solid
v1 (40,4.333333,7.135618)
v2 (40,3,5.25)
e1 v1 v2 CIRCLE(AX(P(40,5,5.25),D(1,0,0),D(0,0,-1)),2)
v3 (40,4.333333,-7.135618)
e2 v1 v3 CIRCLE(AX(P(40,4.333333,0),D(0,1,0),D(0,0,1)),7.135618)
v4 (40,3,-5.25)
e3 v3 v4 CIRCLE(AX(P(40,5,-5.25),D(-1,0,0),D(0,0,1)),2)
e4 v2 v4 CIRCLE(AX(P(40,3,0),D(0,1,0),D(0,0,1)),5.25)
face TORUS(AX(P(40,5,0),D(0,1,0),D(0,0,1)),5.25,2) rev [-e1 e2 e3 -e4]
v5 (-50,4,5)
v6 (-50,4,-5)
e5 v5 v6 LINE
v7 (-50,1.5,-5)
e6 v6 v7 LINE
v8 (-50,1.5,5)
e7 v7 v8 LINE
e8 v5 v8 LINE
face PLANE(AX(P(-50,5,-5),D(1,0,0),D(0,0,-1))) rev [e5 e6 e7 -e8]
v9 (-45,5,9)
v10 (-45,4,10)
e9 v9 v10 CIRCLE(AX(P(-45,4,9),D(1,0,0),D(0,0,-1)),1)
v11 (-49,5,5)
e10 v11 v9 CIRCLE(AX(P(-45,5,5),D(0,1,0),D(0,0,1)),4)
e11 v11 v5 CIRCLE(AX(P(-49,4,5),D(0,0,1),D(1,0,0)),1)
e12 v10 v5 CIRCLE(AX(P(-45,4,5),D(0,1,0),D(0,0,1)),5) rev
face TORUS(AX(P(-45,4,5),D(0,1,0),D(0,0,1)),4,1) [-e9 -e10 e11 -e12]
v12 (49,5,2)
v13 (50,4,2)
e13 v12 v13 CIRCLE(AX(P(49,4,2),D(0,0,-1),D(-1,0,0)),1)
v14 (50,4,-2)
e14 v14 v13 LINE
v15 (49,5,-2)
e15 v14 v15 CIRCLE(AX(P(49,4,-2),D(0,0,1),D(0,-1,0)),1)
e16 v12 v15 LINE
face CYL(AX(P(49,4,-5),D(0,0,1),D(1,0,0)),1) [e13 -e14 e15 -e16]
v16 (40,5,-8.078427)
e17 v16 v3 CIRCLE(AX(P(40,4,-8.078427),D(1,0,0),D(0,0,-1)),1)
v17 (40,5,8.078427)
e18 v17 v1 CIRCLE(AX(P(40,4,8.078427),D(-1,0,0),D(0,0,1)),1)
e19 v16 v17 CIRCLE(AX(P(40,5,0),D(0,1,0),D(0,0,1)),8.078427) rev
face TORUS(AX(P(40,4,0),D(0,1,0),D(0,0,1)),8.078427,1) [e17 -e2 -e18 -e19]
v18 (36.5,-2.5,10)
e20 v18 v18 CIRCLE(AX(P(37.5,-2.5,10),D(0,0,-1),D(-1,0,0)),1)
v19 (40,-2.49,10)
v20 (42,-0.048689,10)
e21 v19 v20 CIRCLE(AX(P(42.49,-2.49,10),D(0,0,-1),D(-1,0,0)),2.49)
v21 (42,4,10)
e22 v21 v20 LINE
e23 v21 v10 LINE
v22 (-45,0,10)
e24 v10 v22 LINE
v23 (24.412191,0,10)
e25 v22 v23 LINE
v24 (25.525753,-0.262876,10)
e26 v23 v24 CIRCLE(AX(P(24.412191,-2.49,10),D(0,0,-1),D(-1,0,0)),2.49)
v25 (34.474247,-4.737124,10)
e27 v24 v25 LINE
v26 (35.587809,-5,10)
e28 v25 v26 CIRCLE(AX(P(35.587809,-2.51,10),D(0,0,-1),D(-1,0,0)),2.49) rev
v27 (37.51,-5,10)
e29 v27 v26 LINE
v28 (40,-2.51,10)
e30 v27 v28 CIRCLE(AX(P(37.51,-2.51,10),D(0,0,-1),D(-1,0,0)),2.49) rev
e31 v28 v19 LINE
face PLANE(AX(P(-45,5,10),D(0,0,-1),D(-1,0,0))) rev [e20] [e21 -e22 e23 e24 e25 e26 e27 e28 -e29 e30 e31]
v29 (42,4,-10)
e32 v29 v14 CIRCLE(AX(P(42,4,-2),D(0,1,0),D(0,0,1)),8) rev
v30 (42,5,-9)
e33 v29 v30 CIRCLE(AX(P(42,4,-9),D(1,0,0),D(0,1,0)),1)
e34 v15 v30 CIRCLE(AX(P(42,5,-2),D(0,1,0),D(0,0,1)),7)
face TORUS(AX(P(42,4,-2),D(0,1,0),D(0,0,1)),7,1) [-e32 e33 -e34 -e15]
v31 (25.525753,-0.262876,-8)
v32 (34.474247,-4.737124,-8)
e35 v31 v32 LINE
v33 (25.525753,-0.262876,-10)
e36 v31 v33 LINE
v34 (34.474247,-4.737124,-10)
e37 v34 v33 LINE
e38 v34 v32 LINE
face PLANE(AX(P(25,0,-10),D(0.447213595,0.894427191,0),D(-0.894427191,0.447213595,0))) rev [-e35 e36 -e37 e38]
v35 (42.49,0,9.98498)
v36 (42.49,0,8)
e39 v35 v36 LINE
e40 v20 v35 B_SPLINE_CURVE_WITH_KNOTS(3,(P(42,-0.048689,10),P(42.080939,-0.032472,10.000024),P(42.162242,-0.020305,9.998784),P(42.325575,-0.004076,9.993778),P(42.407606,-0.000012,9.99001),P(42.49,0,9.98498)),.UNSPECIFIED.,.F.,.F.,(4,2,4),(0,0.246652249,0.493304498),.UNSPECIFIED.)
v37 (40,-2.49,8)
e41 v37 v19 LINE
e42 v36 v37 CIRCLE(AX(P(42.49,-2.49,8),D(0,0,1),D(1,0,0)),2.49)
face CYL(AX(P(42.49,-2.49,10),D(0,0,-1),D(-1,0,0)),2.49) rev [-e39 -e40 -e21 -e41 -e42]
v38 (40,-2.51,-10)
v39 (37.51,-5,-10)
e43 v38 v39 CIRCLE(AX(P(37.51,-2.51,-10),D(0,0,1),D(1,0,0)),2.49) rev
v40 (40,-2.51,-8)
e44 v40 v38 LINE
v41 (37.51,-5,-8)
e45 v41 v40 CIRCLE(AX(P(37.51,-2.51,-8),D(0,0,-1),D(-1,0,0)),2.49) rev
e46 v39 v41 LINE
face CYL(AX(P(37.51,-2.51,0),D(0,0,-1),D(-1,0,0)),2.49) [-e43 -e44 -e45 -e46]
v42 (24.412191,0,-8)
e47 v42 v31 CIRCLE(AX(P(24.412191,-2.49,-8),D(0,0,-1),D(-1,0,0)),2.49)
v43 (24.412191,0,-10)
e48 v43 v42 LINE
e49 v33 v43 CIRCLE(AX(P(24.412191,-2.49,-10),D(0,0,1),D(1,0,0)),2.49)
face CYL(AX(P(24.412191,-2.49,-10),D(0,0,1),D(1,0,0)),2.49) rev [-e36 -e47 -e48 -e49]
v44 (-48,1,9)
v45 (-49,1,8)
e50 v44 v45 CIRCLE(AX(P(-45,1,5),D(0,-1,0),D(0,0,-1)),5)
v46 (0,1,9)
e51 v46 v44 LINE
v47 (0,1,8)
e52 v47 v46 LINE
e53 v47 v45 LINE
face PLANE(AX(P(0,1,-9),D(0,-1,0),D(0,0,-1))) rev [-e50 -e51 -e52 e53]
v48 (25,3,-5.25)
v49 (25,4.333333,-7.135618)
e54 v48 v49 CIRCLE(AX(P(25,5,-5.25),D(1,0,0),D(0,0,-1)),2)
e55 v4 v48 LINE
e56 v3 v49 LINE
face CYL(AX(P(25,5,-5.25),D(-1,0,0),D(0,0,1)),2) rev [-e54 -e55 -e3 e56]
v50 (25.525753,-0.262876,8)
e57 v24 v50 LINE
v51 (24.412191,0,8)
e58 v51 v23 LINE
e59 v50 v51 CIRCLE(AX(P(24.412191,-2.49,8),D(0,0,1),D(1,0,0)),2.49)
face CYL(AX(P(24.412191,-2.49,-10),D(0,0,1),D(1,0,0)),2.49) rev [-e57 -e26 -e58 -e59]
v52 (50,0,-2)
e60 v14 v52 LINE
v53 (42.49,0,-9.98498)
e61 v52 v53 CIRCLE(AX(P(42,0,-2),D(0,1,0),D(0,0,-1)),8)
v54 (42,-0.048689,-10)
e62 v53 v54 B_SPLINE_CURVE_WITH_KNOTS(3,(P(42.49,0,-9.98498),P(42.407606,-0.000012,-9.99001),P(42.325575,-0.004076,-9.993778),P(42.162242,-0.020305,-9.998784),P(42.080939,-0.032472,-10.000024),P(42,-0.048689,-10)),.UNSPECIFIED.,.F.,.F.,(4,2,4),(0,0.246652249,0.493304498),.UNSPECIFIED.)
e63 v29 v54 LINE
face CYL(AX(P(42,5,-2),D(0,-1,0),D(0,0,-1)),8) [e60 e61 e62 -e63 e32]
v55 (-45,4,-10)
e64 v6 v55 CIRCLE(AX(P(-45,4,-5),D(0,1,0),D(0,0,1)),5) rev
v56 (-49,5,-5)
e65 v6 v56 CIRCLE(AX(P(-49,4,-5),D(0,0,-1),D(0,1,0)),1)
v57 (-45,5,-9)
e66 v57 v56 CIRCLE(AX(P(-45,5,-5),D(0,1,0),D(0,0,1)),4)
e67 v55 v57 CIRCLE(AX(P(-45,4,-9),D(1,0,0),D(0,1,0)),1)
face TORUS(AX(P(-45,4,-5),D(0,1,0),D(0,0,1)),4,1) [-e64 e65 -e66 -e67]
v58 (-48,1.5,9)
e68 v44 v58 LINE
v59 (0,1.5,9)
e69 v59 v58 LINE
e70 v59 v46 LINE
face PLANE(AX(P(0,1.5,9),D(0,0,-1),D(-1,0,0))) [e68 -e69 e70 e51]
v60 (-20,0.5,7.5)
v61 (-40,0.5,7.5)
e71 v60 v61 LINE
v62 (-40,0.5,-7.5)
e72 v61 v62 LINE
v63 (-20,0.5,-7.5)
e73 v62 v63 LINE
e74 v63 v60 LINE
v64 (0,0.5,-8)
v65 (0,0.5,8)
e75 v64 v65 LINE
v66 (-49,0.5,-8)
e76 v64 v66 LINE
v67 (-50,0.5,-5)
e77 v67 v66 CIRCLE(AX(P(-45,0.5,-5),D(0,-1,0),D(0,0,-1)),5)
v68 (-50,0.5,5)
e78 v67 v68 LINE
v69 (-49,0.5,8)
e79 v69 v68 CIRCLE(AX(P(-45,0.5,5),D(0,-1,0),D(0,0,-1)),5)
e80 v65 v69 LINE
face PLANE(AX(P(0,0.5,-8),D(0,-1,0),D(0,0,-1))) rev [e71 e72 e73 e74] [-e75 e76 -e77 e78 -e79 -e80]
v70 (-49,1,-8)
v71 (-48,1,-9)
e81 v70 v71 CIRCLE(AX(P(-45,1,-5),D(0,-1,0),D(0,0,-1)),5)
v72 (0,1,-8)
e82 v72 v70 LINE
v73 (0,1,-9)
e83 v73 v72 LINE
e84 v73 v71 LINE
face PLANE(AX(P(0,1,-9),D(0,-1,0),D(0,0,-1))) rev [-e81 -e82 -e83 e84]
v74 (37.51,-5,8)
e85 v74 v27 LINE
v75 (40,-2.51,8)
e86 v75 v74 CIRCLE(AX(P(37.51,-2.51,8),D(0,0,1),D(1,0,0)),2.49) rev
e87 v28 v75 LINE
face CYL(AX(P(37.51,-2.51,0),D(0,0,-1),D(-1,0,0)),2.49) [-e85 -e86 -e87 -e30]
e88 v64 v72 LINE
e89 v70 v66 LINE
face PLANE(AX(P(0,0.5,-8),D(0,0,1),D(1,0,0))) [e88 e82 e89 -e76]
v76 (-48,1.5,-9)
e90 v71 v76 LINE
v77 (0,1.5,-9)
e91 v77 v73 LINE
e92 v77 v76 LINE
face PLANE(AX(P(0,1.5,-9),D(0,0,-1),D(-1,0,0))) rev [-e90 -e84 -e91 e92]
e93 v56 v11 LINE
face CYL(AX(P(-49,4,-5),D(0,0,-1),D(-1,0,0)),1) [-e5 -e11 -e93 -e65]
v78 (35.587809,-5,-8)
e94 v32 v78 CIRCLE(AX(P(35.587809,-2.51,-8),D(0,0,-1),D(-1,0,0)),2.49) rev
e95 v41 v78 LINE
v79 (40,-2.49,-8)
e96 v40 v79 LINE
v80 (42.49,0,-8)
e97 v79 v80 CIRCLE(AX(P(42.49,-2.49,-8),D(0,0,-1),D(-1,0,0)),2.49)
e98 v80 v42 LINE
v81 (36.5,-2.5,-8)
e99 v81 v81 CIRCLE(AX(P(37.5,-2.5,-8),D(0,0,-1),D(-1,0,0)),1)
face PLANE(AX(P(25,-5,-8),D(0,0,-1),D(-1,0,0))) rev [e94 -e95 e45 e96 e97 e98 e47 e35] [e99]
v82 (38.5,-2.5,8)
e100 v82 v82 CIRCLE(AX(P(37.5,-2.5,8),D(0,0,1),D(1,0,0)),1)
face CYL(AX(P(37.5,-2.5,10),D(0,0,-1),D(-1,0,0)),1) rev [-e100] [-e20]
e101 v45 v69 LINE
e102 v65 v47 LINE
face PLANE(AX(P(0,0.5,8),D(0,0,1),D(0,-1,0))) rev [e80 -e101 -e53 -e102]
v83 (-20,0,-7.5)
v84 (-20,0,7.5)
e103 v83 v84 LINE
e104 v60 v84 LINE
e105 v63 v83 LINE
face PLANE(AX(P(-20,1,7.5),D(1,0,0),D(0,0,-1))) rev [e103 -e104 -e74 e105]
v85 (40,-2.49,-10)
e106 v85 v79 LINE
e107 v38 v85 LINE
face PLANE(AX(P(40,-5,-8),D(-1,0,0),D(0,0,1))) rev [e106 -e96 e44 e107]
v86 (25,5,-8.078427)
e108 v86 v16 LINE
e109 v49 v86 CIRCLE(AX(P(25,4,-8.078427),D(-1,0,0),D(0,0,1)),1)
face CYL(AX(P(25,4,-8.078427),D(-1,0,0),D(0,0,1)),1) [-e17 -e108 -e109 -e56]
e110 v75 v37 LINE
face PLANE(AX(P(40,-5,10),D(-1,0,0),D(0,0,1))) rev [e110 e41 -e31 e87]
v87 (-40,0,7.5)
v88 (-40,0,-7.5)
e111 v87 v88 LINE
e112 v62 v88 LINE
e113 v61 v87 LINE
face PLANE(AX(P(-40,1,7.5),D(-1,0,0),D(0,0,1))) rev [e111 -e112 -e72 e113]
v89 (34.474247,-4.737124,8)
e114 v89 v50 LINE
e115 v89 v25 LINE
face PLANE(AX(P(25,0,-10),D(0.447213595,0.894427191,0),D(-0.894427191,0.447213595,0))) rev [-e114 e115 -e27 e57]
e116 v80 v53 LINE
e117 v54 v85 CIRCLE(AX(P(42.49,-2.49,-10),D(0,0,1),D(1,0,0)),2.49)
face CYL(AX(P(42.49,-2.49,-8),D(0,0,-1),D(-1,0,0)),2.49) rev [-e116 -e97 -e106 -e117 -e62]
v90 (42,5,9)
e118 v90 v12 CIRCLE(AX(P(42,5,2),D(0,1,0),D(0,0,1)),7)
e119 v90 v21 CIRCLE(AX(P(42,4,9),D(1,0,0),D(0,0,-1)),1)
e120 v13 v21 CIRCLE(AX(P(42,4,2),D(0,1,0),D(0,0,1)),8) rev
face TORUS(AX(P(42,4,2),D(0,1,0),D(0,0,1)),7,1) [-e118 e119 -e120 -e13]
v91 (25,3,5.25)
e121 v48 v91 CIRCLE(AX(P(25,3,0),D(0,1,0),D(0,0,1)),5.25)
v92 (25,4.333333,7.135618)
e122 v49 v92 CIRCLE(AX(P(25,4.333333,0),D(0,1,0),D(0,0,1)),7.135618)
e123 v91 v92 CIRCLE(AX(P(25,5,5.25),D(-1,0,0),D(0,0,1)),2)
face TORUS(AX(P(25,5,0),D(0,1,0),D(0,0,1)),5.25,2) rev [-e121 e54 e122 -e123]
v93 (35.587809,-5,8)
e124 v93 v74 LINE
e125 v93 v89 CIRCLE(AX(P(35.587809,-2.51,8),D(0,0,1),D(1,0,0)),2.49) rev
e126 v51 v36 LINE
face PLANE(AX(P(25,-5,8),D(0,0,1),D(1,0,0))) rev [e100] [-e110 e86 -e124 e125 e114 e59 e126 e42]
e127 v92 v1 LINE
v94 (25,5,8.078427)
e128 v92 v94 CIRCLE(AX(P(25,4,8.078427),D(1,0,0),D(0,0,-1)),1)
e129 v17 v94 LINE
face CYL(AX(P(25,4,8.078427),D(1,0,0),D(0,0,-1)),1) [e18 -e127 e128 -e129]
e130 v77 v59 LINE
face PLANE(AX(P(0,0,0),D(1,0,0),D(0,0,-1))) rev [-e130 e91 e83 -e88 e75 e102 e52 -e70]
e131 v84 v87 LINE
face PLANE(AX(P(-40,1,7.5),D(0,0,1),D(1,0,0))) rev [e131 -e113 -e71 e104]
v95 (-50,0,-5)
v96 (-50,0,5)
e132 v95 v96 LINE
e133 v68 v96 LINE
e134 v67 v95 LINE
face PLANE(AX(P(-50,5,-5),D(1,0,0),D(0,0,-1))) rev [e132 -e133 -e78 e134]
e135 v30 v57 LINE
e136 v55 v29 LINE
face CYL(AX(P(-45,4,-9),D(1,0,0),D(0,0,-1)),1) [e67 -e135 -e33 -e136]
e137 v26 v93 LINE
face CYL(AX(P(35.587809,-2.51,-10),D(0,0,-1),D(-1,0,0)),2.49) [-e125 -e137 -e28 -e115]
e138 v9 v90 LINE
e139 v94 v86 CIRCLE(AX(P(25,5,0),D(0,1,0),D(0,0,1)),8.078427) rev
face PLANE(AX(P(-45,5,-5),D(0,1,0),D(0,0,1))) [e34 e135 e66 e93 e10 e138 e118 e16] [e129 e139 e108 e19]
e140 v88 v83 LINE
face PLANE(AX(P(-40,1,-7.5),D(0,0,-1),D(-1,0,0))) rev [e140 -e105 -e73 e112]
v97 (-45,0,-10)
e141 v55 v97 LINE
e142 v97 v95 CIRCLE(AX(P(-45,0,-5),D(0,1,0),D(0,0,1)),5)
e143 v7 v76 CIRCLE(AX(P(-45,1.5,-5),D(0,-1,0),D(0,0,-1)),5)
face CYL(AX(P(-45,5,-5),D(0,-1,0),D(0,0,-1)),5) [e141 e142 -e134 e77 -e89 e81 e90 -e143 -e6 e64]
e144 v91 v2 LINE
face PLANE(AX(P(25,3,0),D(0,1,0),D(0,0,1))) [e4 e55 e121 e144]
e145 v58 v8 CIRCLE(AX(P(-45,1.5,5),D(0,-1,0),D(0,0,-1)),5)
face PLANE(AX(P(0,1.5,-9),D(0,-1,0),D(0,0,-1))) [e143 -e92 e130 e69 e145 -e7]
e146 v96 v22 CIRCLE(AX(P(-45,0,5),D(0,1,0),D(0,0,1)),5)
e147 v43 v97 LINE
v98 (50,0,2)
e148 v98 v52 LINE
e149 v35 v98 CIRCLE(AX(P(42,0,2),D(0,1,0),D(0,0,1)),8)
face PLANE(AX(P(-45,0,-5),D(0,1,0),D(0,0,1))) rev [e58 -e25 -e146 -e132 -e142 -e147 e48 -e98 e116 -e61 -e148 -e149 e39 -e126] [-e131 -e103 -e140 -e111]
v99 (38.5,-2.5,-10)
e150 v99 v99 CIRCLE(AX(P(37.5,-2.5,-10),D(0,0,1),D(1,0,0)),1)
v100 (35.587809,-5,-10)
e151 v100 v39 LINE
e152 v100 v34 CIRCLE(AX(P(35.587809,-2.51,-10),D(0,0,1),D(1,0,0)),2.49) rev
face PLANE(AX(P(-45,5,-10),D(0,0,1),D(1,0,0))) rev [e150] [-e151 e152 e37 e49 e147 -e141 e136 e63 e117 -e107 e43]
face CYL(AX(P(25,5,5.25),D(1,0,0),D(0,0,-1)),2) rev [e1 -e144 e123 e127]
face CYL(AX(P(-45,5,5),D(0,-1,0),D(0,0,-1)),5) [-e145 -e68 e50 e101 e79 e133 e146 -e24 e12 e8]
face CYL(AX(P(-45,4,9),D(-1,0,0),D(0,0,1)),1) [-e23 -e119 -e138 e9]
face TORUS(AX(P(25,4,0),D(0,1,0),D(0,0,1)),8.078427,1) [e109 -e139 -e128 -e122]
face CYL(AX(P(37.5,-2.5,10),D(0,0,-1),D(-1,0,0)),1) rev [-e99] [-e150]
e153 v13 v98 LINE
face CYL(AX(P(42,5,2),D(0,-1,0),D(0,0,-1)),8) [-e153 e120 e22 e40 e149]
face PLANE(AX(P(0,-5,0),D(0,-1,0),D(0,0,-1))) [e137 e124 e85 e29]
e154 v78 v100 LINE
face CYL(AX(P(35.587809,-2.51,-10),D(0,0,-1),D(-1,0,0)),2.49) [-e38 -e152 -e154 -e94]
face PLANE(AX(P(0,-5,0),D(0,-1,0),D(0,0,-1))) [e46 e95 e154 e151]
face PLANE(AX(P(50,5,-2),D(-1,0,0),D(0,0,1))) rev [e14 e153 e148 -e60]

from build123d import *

# Parameters (mm, degrees)
BOSS_EXTRUDE1_DEPTH     = 5
CUT_EXTRUDE2_DEPTH      = 2
FILLET1_R               = 2
FILLET2_R               = 1
SKETCH8_W               = 18
SKETCH8_H               = 0.5
SKETCH8_W_2             = 16
CUT_EXTRUDE3_DEPTH      = 50
FILLET3_R               = 1
SKETCH9_W               = 20
SKETCH9_H               = 15
CUT_EXTRUDE4_DEPTH      = 1
SKETCH10_W              = 15
SKETCH10_H              = 2
BOSS_EXTRUDE2_DEPTH     = 5
FILLET4_R               = 2.49
CUT_EXTRUDE5_DEPTH      = 55.083269261
CUT_EXTRUDE5_DEPTH_BACK = 55.083269261
FILLET5_R               = 2.49
CUT_EXTRUDE6_DEPTH      = 55.083269261
CUT_EXTRUDE6_DEPTH_BACK = 55.083269261
SKETCH13_R              = 1


# Some blends are built 0.0001 mm under size
with BuildPart() as part:
    # Sketch2 → Boss-Extrude1 (new body)
    with BuildSketch(Plane(origin=(0, 0, 0), x_dir=(1, 0, 0), z_dir=(0, 1, 0))):
        with BuildLine():
            Line((-45, 10), (42, 10))
            ThreePointArc((42, 10), (47.656854249, 7.656854249), (50, 2))
            Line((50, 2), (50, -2))
            ThreePointArc((50, -2), (47.656854249, -7.656854249), (42, -10))
            Line((42, -10), (-45, -10))
            ThreePointArc((-45, -10), (-48.535533906, -8.535533906), (-50, -5))
            Line((-50, -5), (-50, 5))
            ThreePointArc((-50, 5), (-48.535533906, 8.535533906), (-45, 10))
        make_face()
    extrude(amount=BOSS_EXTRUDE1_DEPTH)

    # Sketch7 → Cut-Extrude2 (cut)
    with BuildSketch(Plane(origin=(0, 5, 0), x_dir=(1, 0, 0), z_dir=(0, 1, 0))):
        with BuildLine():
            Line((25, 7.25), (40, 7.25))
            ThreePointArc((40, 7.25), (47.25, 0), (40, -7.25))
            Line((40, -7.25), (25, -7.25))
            ThreePointArc((25, -7.25), (17.75, 0), (25, 7.25))
        make_face()
    extrude(amount=-CUT_EXTRUDE2_DEPTH, mode=Mode.SUBTRACT)

    # Fillet1
    fillet1_edges = [part.edges().sort_by_distance(p)[0] for p in [
        (32.5, 3, 7.25),
        (17.75, 3, 0),
        (47.25, 3, 0),
        (32.5, 3, -7.25),
    ]]
    fillet(fillet1_edges, radius=FILLET1_R - 0.0001)  # a hair under: the kernel refuses the full size

    # Fillet2
    # the kernel refuses this fillet: 1 mm, written as the material it takes off along each edge
    with BuildSketch(Plane(origin=(25, 5, 0), x_dir=(0, 0, 1), z_dir=(1, 0, 0))) as fillet2_piece_1:
        with BuildLine():
            CenterArc((8.078456413, 1), FILLET2_R, 199.469870121, 70.53012988)
            Line((8.078456413, 0), (8.078456413, -0.1))
            Line((8.078456413, -0.1), (7.25, -0.1))
            Line((7.25, -0.1), (7.15, 0))
            ThreePointArc((7.15, 0), (7.15, 0.0001), (7.041357825, 0.633357779))
            Line((7.041357825, 0.633357779), (7.135639515, 0.66668889))
        make_face()
    revolve(axis=Axis((25, 5, 0), (0, -1, 0)), revolution_arc=180, mode=Mode.SUBTRACT)
    with BuildSketch(Plane(origin=(40, 5, 7.25), x_dir=(0, 0, 1), z_dir=(-1, 0, 0))) as fillet2_piece_2:
        with BuildLine():
            CenterArc((0.828456413, -1), FILLET2_R, 90, 70.530129879)
            Line((-0.114360485, -0.66668889), (-0.208642175, -0.633357779))
            ThreePointArc((-0.208642175, -0.633357779), (-0.1, -0.0001), (-0.1, 0))
            Line((-0.1, 0), (0, 0.1))
            Line((0, 0.1), (0.828456413, 0.1))
            Line((0.828456413, 0.1), (0.828456413, 0))
        make_face()
    extrude(amount=15, mode=Mode.SUBTRACT)
    with BuildSketch(Plane(origin=(40, 5, 0), x_dir=(0, 0, -1), z_dir=(-1, 0, 0))) as fillet2_piece_3:
        with BuildLine():
            CenterArc((8.078456413, 1), FILLET2_R, 199.469870121, 70.530129879)
            Line((7.135639515, 0.66668889), (7.041357825, 0.633357779))
            ThreePointArc((7.041357825, 0.633357779), (7.15, 0.0001), (7.15, 0))
            Line((7.15, 0), (7.25, -0.1))
            Line((7.25, -0.1), (8.078456413, -0.1))
            Line((8.078456413, -0.1), (8.078456413, 0))
        make_face()
    revolve(axis=Axis((40, 5, 0), (0, -1, 0)), revolution_arc=180, mode=Mode.SUBTRACT)
    with BuildSketch(Plane(origin=(25, 5, -7.25), x_dir=(0, -0.9856047790757024, 0.16906572527610647), z_dir=(1, 0, 0))) as fillet2_piece_4:
        with BuildLine():
            CenterArc((0.845541195, 0.985596325), FILLET2_R, 189.733502803, 70.53012988)
            Line((-0.140063584, 0.8165306), (-0.238624062, 0.799624028))
            Line((-0.238624062, 0.799624028), (-0.098560478, -0.016906573))
            Line((-0.098560478, -0.016906573), (0.016906573, -0.098560478))
            ThreePointArc((0.016906573, -0.098560478), (0.017005133, -0.098543571), (0.659514694, -0.098559633))
            Line((0.659514694, -0.098559633), (0.676426194, 0))
        make_face()
    extrude(amount=15, mode=Mode.SUBTRACT)

    # Sketch8 → Cut-Extrude3 (cut)
    with BuildSketch(Plane.ZY.offset(50)):
        with Locations((0, 1.25)):
            Rectangle(SKETCH8_W, SKETCH8_H)
        with Locations((0, 0.75)):
            Rectangle(SKETCH8_W_2, SKETCH8_H)
    extrude(amount=-CUT_EXTRUDE3_DEPTH, mode=Mode.SUBTRACT)

    # Fillet3
    fillet3_edges = [part.edges().sort_by_distance(p)[0] for p in [
        (-48.535533906, 5, 8.535533906),
        (-1.5, 5, 10),
        (47.656854249, 5, 7.656854249),
        (50, 5, 0),
        (47.656854249, 5, -7.656854249),
        (-1.5, 5, -10),
        (-48.535533906, 5, -8.535533906),
        (-50, 5, 0),
    ]]
    fillet(fillet3_edges, radius=FILLET3_R)

    # Sketch9 → Cut-Extrude4 (cut)
    with BuildSketch(Plane.XZ):
        with Locations((-30, 0)):
            Rectangle(SKETCH9_W, SKETCH9_H)
    extrude(amount=-CUT_EXTRUDE4_DEPTH, mode=Mode.SUBTRACT)

    # Sketch10 → Boss-Extrude2 (add)
    with BuildSketch(Plane.XZ):
        with Locations((32.5, 9)):
            Rectangle(SKETCH10_W, SKETCH10_H)
        with Locations((32.5, -9)):
            Rectangle(SKETCH10_W, SKETCH10_H)
    extrude(amount=BOSS_EXTRUDE2_DEPTH)

    # Fillet4
    fillet4_edges = [part.edges().sort_by_distance(p)[0] for p in [
        (40, -5, -9),
        (40, 0, -9),
        (40, -5, 9),
        (40, 0, 9),
    ]]
    fillet(fillet4_edges, radius=FILLET4_R)

    # Sketch12 → Cut-Extrude5 (cut, two sides: drawn at the far end of the back side and taken through both)
    with BuildSketch(Plane.XY.offset(10).offset(-CUT_EXTRUDE5_DEPTH_BACK)):
        Polygon((25, 0), (35, -5), (35, -11.867947074), (25, -11.867947074), align=None)
    extrude(amount=CUT_EXTRUDE5_DEPTH + CUT_EXTRUDE5_DEPTH_BACK, mode=Mode.SUBTRACT)

    # Fillet5
    fillet5_edges = [part.edges().sort_by_distance(p)[0] for p in [
        (25, 0, 9),
        (25, 0, -9),
        (35, -5, -9),
        (35, -5, 9),
    ]]
    fillet(fillet5_edges, radius=FILLET5_R)

    # Sketch13 → Cut-Extrude6 (cut, two sides: drawn at the far end of the back side and taken through both)
    with BuildSketch(Plane(origin=(0, 0, -10), x_dir=(-1, 0, 0), z_dir=(0, 0, -1)).offset(-CUT_EXTRUDE6_DEPTH_BACK)):
        with Locations((-37.5, -2.5)):
            Circle(SKETCH13_R)
    extrude(amount=CUT_EXTRUDE6_DEPTH + CUT_EXTRUDE6_DEPTH_BACK, mode=Mode.SUBTRACT)


solid = part.part
